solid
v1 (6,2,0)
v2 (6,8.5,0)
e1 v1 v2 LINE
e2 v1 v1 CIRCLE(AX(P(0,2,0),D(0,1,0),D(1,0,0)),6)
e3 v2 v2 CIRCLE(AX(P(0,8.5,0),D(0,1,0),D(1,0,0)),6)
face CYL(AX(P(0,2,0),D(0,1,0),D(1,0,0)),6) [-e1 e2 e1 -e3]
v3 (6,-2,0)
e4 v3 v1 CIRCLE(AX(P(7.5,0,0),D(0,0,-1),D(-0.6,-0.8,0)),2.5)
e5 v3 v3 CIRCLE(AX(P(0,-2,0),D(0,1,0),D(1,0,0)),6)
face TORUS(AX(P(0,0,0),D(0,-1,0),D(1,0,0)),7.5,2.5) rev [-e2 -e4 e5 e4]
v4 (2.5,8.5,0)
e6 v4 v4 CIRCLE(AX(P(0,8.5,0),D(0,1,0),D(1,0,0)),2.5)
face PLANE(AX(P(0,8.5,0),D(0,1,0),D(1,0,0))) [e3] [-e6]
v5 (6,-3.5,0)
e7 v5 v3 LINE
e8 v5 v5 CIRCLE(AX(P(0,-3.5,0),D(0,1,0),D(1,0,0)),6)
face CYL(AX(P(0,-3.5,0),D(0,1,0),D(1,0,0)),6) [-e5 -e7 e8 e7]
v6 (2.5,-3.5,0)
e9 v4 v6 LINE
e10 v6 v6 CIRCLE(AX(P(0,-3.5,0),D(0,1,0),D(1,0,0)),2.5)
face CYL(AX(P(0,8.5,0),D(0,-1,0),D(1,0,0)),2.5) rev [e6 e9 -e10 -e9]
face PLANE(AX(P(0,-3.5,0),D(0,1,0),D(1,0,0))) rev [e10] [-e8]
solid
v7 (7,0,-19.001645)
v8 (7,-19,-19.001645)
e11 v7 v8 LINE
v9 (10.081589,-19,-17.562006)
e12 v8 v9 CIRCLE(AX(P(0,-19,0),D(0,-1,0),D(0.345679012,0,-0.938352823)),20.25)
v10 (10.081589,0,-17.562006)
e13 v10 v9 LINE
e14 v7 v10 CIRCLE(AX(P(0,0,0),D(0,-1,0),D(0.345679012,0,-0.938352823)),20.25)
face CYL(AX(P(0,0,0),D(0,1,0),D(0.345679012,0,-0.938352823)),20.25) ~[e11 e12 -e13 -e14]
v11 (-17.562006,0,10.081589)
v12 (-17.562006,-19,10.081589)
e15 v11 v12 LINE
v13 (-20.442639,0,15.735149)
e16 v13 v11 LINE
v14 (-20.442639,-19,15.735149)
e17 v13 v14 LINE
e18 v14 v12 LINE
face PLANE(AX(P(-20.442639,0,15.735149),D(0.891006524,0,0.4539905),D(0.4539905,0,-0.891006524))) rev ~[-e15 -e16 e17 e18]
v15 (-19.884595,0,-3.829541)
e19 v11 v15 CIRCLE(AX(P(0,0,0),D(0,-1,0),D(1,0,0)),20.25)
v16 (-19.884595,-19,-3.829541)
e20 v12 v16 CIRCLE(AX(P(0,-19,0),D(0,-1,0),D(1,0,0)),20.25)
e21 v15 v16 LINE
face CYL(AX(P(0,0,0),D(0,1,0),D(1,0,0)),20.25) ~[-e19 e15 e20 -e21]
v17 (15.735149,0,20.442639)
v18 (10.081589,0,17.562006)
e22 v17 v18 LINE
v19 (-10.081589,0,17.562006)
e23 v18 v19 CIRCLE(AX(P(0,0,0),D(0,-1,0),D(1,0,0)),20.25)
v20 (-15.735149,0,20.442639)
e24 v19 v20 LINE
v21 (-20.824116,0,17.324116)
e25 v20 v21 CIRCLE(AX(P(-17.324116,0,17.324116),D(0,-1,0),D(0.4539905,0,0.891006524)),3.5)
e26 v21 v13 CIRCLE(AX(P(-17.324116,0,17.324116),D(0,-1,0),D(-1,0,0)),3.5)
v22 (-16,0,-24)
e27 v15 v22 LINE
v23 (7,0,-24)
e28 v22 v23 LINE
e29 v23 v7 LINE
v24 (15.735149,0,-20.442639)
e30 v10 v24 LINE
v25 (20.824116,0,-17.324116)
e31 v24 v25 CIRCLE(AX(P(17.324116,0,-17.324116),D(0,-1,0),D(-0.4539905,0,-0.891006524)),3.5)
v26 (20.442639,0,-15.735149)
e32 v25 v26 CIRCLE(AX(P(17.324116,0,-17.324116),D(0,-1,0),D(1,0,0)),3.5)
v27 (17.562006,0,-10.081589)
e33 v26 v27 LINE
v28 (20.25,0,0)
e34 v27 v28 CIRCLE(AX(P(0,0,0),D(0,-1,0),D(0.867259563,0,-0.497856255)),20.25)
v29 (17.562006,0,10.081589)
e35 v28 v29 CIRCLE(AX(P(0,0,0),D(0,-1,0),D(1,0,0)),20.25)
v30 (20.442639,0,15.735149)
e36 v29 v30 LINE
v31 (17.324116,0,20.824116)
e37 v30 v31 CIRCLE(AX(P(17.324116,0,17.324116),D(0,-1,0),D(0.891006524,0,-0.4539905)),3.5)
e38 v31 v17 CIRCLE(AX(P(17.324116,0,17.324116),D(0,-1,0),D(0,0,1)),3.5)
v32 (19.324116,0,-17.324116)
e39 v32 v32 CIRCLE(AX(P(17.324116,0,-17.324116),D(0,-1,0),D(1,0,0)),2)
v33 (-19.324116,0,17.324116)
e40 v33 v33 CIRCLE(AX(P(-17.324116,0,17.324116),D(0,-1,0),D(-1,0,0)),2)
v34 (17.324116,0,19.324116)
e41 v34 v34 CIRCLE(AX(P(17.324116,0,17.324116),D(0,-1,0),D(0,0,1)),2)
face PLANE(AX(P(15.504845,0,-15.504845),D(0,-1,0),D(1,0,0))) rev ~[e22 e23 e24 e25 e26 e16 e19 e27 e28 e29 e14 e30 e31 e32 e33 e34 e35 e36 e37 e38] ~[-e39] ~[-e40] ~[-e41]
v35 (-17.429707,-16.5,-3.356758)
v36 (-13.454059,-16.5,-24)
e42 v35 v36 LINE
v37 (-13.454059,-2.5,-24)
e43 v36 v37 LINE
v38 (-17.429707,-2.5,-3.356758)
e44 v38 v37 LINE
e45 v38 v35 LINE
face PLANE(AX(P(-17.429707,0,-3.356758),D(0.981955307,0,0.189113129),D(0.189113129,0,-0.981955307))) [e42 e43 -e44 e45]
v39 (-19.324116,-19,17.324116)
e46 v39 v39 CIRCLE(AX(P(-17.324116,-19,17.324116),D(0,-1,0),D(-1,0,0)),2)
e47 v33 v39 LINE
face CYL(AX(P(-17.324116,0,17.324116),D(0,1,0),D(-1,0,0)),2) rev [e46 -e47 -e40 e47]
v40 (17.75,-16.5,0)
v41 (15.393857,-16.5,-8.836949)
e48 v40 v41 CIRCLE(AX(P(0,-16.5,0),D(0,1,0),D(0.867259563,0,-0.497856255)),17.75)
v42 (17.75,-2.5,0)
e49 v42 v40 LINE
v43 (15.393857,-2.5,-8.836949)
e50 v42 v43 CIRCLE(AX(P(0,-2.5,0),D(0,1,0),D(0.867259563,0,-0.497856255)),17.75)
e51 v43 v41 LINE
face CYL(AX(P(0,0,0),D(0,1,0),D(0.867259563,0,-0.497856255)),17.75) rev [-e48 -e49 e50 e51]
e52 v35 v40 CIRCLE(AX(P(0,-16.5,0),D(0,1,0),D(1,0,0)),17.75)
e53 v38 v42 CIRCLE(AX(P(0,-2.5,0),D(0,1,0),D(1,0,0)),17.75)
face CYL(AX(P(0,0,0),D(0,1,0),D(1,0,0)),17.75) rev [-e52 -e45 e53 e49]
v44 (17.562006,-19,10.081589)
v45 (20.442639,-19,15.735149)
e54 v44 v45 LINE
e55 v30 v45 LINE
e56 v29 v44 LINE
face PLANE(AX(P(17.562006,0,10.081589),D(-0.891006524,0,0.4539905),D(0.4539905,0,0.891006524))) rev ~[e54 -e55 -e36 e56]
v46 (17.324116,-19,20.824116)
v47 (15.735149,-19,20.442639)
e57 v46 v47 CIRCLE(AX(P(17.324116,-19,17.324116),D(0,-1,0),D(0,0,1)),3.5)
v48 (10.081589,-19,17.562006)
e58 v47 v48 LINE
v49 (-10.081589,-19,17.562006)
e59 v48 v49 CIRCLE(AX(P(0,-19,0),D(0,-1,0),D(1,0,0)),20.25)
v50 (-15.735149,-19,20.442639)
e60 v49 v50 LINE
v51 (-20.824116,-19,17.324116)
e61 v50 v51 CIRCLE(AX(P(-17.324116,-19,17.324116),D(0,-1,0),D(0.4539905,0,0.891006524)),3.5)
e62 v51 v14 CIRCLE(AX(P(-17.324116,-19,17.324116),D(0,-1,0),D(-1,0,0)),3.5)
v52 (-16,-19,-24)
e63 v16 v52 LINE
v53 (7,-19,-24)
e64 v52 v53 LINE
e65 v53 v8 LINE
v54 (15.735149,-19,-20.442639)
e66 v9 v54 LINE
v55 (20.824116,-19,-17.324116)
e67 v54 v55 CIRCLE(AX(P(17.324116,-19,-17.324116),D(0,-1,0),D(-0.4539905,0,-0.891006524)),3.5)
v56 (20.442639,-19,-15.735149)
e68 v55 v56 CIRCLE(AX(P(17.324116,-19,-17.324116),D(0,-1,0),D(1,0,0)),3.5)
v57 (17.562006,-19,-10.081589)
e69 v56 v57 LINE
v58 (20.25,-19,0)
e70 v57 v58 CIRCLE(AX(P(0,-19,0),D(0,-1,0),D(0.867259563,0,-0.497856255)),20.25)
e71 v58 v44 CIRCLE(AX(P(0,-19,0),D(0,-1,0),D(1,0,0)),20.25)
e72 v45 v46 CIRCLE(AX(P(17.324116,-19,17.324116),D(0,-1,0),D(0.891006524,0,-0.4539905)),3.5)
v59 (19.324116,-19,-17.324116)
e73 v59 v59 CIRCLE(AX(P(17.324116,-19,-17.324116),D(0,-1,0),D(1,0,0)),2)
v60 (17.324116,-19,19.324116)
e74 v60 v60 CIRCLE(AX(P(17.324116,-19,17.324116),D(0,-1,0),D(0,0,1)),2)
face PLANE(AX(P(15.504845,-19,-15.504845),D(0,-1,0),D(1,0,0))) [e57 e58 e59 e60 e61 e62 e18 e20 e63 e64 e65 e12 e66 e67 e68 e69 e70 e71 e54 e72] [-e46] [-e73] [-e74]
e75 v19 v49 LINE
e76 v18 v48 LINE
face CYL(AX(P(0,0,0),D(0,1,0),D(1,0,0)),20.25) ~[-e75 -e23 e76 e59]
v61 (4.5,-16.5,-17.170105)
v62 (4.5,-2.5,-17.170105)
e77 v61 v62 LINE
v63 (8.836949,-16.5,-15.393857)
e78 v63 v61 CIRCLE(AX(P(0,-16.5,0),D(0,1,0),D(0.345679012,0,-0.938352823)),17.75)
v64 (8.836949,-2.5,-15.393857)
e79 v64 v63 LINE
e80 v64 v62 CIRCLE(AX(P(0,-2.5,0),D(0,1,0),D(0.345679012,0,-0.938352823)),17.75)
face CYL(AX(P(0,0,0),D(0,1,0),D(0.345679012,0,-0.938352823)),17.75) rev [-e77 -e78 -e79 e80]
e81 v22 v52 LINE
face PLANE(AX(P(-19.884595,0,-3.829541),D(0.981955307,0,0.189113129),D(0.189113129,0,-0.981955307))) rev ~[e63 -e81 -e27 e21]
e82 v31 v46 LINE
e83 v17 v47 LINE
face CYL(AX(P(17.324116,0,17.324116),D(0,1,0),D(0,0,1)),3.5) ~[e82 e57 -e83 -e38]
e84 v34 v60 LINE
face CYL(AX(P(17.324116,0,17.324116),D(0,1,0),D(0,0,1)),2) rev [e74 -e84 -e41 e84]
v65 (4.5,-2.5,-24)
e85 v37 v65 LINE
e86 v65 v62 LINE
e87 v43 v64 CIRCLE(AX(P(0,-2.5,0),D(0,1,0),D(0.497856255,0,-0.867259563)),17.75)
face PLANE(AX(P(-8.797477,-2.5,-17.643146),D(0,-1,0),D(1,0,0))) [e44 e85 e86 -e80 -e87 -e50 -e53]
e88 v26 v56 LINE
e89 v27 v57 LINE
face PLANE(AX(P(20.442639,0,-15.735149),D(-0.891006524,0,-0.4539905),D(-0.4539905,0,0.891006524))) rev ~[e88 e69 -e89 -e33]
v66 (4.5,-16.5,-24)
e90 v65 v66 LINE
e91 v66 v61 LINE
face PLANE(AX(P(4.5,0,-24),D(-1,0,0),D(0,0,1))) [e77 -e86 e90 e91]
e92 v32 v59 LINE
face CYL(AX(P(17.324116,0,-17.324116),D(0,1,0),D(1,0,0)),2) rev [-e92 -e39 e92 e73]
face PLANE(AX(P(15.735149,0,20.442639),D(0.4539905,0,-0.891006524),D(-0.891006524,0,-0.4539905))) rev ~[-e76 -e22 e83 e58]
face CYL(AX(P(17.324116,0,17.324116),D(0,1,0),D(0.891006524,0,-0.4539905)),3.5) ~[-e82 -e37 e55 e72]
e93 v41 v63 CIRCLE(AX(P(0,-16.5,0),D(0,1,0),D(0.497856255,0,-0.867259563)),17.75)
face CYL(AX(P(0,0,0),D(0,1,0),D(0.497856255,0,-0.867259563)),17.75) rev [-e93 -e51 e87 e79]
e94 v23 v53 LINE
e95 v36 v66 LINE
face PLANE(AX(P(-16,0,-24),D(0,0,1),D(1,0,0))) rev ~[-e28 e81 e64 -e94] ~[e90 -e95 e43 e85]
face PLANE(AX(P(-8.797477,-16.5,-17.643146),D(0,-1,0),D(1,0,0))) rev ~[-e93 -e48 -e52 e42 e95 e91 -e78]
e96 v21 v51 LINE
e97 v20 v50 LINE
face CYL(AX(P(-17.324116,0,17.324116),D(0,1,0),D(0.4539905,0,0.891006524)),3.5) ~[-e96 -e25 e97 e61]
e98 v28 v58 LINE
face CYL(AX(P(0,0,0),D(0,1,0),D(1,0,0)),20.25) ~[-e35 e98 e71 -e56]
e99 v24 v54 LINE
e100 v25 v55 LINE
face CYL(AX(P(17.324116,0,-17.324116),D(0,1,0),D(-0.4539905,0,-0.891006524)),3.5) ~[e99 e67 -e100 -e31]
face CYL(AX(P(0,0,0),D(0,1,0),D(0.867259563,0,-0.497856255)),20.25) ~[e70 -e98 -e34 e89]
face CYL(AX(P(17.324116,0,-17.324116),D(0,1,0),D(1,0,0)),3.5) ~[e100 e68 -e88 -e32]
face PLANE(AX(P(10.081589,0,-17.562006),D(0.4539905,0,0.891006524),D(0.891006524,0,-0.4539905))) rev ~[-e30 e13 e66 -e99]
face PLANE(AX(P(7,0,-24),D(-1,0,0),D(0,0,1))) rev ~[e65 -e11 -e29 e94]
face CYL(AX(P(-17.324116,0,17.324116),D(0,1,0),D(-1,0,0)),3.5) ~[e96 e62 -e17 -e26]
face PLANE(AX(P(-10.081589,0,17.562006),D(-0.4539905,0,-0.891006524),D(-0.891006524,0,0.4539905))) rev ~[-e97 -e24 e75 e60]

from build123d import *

# Parameters (mm, degrees)
F4_DEPTH        = 19
F5_T            = -2.5
F3_R            = 2
F6_DEPTH        = 19
F6_COPIES_COUNT = 3
F6_COPIES_ANGLE = 180


# Not quite as in the source:
# - a pattern or mirror of a feature is missing from the dataset's text; its kind, count and spacing are read off the source's solid


with BuildPart() as f1:
    # F0 (on Top) → F1 (revolve)
    with BuildSketch(Plane.XY):
        with BuildLine():
            Line((2.5, 8.5), (2.5, -3.5))
            Line((2.5, -3.5), (6, -3.5))
            Line((6, -3.5), (6, -2))
            ThreePointArc((6, -2), (5, 0), (6, 2))
            Line((6, 2), (6, 8.5))
            Line((6, 8.5), (2.5, 8.5))
        make_face()
    revolve(axis=Axis((0, 9.24498985, 0), (0, 1, 0)))


with BuildPart() as f4:
    # F3 (on Front) → F4 (new body)
    with BuildSketch(Plane.XZ):
        with BuildLine():
            ThreePointArc((7, -19.0016446657), (-9.9524559943, -17.6355073554), (-19.8845949623, -3.8295408585))
            Line((-19.8845949623, -3.8295408585), (-16, -24))
            Line((-16, -24), (7, -24))
            Line((7, -24), (7, -19.0016446657))
        make_face()
        with BuildLine():
            ThreePointArc((17.5620061533, -10.0815891541), (19.566465248, -5.2168896574), (20.25, 0))
            ThreePointArc((20.25, 0), (-1.9234671838, 20.1584417551), (-19.8845949623, -3.8295408585))
            ThreePointArc((-19.8845949623, -3.8295408585), (-9.9524559943, -17.6355073554), (7, -19.0016446657))
            ThreePointArc((7, -19.0016446657), (8.5710741316, -18.3466396986), (10.0815891541, -17.5620061533))
            ThreePointArc((10.0815891541, -17.5620061533), (14.318912319, -14.318912319), (17.5620061533, -10.0815891541))
        make_face()
    extrude(amount=F4_DEPTH)

    # F5
    f5_openings = [f4.faces().sort_by_distance(p)[0] for p in [
        (-4.5, -9.5, -24),
    ]]
    offset(amount=F5_T, openings=f5_openings, kind=Kind.INTERSECTION)

    # F3 (on Front) → F6 (join, through all)
    with BuildSketch(Plane.XZ):
        with BuildLine():
            Line((20.4426389737, -15.73514939), (17.5620061533, -10.0815891541))
            ThreePointArc((17.5620061533, -10.0815891541), (14.318912319, -14.318912319), (10.0815891541, -17.5620061533))
            Line((10.0815891541, -17.5620061533), (15.73514939, -20.4426389737))
            ThreePointArc((15.73514939, -20.4426389737), (14.8492424049, -14.8492424049), (20.4426389737, -15.73514939))
        make_face()
        with BuildLine():
            ThreePointArc((20.8241161391, -17.3241161391), (20.7274108605, -16.5070573656), (20.4426389737, -15.73514939))
            ThreePointArc((20.4426389737, -15.73514939), (14.8492424049, -14.8492424049), (15.73514939, -20.4426389737))
            ThreePointArc((15.73514939, -20.4426389737), (19.1528611156, -20.3083567143), (20.8241161391, -17.3241161391))
        make_face()
        with Locations((17.3241161391, -17.3241161391)):
            Circle(F3_R, mode=Mode.SUBTRACT)
    f6 = extrude(amount=F6_DEPTH)

    # F6_copies: F6 ×3 about axis
    f6_copies_axis = Axis((0, 0, 0), (0, -1, 0))
    for i in range(1, F6_COPIES_COUNT):
        add(f6.rotate(f6_copies_axis, i * F6_COPIES_ANGLE / (F6_COPIES_COUNT - 1)))


solid = Compound([f1.part, f4.part])
